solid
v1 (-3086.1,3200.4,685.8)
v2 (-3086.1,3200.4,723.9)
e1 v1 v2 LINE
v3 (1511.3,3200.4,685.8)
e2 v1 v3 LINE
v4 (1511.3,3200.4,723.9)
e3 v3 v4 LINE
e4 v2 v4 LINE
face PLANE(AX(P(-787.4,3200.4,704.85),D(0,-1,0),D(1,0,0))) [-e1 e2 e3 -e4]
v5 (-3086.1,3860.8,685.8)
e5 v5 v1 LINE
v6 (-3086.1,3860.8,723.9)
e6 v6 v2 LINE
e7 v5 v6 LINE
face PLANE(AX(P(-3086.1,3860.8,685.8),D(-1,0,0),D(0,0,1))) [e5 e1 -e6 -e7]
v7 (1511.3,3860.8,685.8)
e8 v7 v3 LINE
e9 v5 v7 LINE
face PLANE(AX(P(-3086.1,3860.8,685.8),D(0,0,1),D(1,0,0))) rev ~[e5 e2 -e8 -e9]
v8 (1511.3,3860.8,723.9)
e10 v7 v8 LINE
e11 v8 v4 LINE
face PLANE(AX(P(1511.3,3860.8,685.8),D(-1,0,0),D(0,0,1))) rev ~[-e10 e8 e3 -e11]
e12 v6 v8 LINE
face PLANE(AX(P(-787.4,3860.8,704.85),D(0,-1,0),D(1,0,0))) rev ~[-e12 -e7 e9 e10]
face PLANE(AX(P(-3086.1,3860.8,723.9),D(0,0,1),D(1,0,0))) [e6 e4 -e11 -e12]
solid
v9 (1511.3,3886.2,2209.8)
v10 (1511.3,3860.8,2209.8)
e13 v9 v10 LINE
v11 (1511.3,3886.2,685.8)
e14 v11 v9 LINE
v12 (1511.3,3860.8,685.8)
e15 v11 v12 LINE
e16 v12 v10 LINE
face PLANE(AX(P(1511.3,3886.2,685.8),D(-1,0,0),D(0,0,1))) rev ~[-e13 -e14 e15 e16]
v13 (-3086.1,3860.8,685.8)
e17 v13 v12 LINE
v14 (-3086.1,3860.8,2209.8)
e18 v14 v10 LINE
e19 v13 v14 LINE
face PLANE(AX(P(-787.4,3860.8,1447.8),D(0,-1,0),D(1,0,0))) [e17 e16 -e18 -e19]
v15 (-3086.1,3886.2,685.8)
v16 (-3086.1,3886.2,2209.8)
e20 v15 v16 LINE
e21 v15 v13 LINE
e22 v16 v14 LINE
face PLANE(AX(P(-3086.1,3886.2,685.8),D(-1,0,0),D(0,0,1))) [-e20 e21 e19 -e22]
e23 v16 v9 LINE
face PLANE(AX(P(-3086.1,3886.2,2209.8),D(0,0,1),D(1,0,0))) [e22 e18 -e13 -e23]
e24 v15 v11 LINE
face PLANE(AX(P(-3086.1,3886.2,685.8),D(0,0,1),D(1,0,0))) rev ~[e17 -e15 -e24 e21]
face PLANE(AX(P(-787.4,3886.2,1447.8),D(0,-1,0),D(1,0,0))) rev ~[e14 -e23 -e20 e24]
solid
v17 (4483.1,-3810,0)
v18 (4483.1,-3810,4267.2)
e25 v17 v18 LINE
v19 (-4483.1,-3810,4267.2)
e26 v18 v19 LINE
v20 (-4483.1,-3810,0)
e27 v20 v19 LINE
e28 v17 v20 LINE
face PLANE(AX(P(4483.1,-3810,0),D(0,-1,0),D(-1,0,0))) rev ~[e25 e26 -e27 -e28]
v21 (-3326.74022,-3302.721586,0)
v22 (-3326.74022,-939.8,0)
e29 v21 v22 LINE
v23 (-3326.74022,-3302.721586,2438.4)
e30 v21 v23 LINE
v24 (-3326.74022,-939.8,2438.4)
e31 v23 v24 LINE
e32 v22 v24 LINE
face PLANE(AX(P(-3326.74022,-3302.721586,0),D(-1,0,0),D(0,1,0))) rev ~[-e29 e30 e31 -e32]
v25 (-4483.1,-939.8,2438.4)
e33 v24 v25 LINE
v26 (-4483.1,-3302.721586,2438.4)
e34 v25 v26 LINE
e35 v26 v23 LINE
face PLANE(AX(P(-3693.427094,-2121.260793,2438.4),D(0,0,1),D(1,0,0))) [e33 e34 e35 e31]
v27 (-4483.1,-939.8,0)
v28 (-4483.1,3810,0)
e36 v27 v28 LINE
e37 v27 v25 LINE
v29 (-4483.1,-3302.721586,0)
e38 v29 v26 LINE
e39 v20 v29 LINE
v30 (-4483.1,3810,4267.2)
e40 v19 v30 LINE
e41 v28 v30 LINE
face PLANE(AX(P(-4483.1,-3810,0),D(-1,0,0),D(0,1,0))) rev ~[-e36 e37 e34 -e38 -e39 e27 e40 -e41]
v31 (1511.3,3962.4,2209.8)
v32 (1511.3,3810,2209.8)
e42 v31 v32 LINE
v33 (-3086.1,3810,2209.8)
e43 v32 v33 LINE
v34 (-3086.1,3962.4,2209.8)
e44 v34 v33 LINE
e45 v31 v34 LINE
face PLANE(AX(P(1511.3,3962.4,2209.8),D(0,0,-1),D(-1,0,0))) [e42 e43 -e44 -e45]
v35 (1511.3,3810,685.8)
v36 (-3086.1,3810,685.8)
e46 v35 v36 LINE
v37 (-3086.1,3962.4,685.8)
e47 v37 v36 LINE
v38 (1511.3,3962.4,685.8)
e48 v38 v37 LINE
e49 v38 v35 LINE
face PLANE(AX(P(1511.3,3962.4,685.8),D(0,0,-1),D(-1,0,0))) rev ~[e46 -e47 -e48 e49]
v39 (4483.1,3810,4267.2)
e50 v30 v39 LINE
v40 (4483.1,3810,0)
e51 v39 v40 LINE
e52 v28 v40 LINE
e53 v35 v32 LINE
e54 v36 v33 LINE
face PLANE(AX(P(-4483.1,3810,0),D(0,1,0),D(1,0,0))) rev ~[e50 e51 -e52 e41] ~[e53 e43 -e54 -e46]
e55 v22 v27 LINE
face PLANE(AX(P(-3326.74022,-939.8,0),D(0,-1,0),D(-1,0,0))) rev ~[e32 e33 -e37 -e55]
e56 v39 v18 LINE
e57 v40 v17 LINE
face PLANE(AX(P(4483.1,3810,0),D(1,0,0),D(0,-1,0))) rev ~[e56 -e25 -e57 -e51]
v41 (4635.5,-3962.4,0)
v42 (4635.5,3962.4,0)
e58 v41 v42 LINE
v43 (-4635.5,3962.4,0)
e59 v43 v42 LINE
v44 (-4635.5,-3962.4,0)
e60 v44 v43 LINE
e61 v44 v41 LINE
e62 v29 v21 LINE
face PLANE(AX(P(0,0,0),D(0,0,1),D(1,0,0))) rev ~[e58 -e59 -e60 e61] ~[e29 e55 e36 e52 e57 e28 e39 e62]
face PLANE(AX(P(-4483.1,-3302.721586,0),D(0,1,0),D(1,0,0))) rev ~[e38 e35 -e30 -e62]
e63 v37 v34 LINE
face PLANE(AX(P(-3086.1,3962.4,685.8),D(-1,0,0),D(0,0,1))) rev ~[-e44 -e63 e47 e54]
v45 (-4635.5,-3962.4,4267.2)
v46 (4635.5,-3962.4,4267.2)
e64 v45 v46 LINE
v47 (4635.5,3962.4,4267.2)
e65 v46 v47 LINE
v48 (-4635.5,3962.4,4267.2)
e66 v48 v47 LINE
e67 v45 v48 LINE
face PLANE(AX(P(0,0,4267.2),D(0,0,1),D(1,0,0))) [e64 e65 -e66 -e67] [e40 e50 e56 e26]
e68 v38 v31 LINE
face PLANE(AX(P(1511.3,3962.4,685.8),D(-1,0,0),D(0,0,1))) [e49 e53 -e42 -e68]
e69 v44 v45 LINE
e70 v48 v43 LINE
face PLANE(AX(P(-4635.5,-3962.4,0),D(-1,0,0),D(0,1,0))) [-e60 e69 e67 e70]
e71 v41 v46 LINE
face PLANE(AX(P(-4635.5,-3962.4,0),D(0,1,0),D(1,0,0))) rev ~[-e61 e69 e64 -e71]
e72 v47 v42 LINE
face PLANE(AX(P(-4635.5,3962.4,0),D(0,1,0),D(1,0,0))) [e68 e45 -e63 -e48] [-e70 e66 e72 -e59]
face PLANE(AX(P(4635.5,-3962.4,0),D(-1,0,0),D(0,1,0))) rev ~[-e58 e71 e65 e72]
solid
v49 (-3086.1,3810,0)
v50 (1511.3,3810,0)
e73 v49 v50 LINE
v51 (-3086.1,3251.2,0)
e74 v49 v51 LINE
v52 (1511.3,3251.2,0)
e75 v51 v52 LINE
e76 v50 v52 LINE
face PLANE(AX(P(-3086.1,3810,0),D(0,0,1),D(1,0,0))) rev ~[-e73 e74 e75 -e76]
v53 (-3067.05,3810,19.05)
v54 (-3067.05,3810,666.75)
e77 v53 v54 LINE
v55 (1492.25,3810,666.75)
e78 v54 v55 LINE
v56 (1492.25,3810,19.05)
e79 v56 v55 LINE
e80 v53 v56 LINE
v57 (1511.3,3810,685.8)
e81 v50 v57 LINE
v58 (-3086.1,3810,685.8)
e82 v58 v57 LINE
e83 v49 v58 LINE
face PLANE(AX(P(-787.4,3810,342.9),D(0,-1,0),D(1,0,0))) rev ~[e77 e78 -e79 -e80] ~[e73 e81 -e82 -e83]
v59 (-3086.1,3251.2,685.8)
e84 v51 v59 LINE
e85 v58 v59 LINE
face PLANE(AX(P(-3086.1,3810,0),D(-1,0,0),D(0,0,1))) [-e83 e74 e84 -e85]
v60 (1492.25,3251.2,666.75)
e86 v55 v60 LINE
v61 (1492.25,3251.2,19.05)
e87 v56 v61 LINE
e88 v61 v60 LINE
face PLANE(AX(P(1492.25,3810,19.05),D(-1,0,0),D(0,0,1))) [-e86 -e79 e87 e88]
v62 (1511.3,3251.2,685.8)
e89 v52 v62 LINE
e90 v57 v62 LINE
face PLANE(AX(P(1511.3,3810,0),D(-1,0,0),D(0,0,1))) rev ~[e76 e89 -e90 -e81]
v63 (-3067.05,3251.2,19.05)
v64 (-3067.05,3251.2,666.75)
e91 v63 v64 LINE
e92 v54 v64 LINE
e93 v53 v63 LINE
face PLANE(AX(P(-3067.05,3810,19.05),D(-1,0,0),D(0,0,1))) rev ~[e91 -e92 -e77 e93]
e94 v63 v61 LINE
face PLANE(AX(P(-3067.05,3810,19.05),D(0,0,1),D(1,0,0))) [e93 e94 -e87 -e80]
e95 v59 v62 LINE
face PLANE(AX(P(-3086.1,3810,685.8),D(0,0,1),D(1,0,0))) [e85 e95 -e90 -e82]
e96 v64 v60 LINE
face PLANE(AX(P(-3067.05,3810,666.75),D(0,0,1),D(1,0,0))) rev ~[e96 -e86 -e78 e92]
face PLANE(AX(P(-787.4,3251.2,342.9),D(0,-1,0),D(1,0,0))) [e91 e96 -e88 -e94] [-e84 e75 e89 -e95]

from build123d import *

# Parameters (mm, degrees)
F0_W      = 9271
F0_H      = 7924.8
F1_DEPTH  = 4267.2
F2_DEPTH  = 25.4
F4_W      = 4597.4
F4_H      = 1524
F5_DEPTH  = 152.4
F6_W      = 1003.959779666
F6_H      = 2058.1215861365
F7_DEPTH  = 2438.4
F9_W      = 4597.4
F9_H      = 1524
F10_DEPTH = 25.4
F12_W     = 4597.4
F12_H     = 685.8
F12_W_2   = 4559.3
F12_H_2   = 647.7
F13_DEPTH = 558.8
F11_W     = 4597.4
F11_H     = 38.1
F14_DEPTH = 660.4
F15_W     = 50.8
F15_H     = 50.8
F16_DEPTH = 8966.2


# Not quite as in the source:
# - the program builds the solid bodies; features that only make, move or delete a surface that nothing else refers to are left out


with BuildPart() as f1:
    # F0 (on Top) → F1 (new body)
    with BuildSketch(Plane.XY):
        Rectangle(F0_W, F0_H)
        Polygon((4483.1, 2595.4701114655), (4483.1, -3810), (-4483.1, -3810), (-4483.1, 3810), (2247.9, 3810), (2349.5, 3810), (4483.1, 3810), (4483.1, 2697.0701114655), align=None, mode=Mode.SUBTRACT)
    extrude(amount=F1_DEPTH)

    # F0 (on Top) → F2 (join)
    with BuildSketch(Plane.XY):
        Rectangle(F0_W, F0_H)
        Polygon((4483.1, 2595.4701114655), (4483.1, -3810), (-4483.1, -3810), (-4483.1, 3810), (2247.9, 3810), (2349.5, 3810), (4483.1, 3810), (4483.1, 2697.0701114655), align=None, mode=Mode.SUBTRACT)
    extrude(amount=F2_DEPTH)

    # F4 (on face) → F5 (cut, through all)
    with BuildSketch(Plane(origin=(0, 3962.4, 0), x_dir=(-1, 0, 0), z_dir=(0, 1, 0))):
        with Locations((787.4, 1447.8)):
            Rectangle(F4_W, F4_H)
    extrude(amount=-F5_DEPTH, mode=Mode.SUBTRACT)

    # F6 (on Top) → F7 (join)
    with BuildSketch(Plane.XY):
        Polygon((-3326.740220334, -939.8), (-4483.1, -939.8), (-4483.1, -1092.2), (-3479.140220334, -1092.2), (-3479.140220334, -3150.3215861365), (-4483.1, -3150.3215861365), (-4483.1, -3302.7215861365), (-3326.740220334, -3302.7215861365), align=None)
        with Locations((-3981.120110167, -2121.2607930683)):
            Rectangle(F6_W, F6_H)
    extrude(amount=F7_DEPTH)


with BuildPart() as f10:
    # F9 (on offset) → F10 (new body)
    with BuildSketch(Plane.XZ.offset(-3886.2)):
        with Locations((-787.4, 1447.8)):
            Rectangle(F9_W, F9_H)
    extrude(amount=F10_DEPTH)


with BuildPart() as f13:
    # F12 (on face) → F13 (new body)
    with BuildSketch(Plane.XZ.offset(-3810)):
        with Locations((-787.4, 342.9)):
            Rectangle(F12_W, F12_H)
        with Locations((-787.4, 342.9)):
            Rectangle(F12_W_2, F12_H_2, mode=Mode.SUBTRACT)
    extrude(amount=F13_DEPTH)


with BuildPart() as f14:
    # F11 (on face) → F14 (new body)
    with BuildSketch(Plane.XZ.offset(-3860.8)):
        with Locations((-787.4, 704.85)):
            Rectangle(F11_W, F11_H)
    extrude(amount=F14_DEPTH)


with BuildPart() as f16:
    # F15 (on face) → F16 (new body, through all)
    with BuildSketch(Plane.YZ.offset(-4483.1)):
        with Locations((-914.4, 3276.6)):
            Rectangle(F15_W, F15_H)
    extrude(amount=F16_DEPTH)


solid = Compound([f1.part, f10.part, f13.part, f14.part])
